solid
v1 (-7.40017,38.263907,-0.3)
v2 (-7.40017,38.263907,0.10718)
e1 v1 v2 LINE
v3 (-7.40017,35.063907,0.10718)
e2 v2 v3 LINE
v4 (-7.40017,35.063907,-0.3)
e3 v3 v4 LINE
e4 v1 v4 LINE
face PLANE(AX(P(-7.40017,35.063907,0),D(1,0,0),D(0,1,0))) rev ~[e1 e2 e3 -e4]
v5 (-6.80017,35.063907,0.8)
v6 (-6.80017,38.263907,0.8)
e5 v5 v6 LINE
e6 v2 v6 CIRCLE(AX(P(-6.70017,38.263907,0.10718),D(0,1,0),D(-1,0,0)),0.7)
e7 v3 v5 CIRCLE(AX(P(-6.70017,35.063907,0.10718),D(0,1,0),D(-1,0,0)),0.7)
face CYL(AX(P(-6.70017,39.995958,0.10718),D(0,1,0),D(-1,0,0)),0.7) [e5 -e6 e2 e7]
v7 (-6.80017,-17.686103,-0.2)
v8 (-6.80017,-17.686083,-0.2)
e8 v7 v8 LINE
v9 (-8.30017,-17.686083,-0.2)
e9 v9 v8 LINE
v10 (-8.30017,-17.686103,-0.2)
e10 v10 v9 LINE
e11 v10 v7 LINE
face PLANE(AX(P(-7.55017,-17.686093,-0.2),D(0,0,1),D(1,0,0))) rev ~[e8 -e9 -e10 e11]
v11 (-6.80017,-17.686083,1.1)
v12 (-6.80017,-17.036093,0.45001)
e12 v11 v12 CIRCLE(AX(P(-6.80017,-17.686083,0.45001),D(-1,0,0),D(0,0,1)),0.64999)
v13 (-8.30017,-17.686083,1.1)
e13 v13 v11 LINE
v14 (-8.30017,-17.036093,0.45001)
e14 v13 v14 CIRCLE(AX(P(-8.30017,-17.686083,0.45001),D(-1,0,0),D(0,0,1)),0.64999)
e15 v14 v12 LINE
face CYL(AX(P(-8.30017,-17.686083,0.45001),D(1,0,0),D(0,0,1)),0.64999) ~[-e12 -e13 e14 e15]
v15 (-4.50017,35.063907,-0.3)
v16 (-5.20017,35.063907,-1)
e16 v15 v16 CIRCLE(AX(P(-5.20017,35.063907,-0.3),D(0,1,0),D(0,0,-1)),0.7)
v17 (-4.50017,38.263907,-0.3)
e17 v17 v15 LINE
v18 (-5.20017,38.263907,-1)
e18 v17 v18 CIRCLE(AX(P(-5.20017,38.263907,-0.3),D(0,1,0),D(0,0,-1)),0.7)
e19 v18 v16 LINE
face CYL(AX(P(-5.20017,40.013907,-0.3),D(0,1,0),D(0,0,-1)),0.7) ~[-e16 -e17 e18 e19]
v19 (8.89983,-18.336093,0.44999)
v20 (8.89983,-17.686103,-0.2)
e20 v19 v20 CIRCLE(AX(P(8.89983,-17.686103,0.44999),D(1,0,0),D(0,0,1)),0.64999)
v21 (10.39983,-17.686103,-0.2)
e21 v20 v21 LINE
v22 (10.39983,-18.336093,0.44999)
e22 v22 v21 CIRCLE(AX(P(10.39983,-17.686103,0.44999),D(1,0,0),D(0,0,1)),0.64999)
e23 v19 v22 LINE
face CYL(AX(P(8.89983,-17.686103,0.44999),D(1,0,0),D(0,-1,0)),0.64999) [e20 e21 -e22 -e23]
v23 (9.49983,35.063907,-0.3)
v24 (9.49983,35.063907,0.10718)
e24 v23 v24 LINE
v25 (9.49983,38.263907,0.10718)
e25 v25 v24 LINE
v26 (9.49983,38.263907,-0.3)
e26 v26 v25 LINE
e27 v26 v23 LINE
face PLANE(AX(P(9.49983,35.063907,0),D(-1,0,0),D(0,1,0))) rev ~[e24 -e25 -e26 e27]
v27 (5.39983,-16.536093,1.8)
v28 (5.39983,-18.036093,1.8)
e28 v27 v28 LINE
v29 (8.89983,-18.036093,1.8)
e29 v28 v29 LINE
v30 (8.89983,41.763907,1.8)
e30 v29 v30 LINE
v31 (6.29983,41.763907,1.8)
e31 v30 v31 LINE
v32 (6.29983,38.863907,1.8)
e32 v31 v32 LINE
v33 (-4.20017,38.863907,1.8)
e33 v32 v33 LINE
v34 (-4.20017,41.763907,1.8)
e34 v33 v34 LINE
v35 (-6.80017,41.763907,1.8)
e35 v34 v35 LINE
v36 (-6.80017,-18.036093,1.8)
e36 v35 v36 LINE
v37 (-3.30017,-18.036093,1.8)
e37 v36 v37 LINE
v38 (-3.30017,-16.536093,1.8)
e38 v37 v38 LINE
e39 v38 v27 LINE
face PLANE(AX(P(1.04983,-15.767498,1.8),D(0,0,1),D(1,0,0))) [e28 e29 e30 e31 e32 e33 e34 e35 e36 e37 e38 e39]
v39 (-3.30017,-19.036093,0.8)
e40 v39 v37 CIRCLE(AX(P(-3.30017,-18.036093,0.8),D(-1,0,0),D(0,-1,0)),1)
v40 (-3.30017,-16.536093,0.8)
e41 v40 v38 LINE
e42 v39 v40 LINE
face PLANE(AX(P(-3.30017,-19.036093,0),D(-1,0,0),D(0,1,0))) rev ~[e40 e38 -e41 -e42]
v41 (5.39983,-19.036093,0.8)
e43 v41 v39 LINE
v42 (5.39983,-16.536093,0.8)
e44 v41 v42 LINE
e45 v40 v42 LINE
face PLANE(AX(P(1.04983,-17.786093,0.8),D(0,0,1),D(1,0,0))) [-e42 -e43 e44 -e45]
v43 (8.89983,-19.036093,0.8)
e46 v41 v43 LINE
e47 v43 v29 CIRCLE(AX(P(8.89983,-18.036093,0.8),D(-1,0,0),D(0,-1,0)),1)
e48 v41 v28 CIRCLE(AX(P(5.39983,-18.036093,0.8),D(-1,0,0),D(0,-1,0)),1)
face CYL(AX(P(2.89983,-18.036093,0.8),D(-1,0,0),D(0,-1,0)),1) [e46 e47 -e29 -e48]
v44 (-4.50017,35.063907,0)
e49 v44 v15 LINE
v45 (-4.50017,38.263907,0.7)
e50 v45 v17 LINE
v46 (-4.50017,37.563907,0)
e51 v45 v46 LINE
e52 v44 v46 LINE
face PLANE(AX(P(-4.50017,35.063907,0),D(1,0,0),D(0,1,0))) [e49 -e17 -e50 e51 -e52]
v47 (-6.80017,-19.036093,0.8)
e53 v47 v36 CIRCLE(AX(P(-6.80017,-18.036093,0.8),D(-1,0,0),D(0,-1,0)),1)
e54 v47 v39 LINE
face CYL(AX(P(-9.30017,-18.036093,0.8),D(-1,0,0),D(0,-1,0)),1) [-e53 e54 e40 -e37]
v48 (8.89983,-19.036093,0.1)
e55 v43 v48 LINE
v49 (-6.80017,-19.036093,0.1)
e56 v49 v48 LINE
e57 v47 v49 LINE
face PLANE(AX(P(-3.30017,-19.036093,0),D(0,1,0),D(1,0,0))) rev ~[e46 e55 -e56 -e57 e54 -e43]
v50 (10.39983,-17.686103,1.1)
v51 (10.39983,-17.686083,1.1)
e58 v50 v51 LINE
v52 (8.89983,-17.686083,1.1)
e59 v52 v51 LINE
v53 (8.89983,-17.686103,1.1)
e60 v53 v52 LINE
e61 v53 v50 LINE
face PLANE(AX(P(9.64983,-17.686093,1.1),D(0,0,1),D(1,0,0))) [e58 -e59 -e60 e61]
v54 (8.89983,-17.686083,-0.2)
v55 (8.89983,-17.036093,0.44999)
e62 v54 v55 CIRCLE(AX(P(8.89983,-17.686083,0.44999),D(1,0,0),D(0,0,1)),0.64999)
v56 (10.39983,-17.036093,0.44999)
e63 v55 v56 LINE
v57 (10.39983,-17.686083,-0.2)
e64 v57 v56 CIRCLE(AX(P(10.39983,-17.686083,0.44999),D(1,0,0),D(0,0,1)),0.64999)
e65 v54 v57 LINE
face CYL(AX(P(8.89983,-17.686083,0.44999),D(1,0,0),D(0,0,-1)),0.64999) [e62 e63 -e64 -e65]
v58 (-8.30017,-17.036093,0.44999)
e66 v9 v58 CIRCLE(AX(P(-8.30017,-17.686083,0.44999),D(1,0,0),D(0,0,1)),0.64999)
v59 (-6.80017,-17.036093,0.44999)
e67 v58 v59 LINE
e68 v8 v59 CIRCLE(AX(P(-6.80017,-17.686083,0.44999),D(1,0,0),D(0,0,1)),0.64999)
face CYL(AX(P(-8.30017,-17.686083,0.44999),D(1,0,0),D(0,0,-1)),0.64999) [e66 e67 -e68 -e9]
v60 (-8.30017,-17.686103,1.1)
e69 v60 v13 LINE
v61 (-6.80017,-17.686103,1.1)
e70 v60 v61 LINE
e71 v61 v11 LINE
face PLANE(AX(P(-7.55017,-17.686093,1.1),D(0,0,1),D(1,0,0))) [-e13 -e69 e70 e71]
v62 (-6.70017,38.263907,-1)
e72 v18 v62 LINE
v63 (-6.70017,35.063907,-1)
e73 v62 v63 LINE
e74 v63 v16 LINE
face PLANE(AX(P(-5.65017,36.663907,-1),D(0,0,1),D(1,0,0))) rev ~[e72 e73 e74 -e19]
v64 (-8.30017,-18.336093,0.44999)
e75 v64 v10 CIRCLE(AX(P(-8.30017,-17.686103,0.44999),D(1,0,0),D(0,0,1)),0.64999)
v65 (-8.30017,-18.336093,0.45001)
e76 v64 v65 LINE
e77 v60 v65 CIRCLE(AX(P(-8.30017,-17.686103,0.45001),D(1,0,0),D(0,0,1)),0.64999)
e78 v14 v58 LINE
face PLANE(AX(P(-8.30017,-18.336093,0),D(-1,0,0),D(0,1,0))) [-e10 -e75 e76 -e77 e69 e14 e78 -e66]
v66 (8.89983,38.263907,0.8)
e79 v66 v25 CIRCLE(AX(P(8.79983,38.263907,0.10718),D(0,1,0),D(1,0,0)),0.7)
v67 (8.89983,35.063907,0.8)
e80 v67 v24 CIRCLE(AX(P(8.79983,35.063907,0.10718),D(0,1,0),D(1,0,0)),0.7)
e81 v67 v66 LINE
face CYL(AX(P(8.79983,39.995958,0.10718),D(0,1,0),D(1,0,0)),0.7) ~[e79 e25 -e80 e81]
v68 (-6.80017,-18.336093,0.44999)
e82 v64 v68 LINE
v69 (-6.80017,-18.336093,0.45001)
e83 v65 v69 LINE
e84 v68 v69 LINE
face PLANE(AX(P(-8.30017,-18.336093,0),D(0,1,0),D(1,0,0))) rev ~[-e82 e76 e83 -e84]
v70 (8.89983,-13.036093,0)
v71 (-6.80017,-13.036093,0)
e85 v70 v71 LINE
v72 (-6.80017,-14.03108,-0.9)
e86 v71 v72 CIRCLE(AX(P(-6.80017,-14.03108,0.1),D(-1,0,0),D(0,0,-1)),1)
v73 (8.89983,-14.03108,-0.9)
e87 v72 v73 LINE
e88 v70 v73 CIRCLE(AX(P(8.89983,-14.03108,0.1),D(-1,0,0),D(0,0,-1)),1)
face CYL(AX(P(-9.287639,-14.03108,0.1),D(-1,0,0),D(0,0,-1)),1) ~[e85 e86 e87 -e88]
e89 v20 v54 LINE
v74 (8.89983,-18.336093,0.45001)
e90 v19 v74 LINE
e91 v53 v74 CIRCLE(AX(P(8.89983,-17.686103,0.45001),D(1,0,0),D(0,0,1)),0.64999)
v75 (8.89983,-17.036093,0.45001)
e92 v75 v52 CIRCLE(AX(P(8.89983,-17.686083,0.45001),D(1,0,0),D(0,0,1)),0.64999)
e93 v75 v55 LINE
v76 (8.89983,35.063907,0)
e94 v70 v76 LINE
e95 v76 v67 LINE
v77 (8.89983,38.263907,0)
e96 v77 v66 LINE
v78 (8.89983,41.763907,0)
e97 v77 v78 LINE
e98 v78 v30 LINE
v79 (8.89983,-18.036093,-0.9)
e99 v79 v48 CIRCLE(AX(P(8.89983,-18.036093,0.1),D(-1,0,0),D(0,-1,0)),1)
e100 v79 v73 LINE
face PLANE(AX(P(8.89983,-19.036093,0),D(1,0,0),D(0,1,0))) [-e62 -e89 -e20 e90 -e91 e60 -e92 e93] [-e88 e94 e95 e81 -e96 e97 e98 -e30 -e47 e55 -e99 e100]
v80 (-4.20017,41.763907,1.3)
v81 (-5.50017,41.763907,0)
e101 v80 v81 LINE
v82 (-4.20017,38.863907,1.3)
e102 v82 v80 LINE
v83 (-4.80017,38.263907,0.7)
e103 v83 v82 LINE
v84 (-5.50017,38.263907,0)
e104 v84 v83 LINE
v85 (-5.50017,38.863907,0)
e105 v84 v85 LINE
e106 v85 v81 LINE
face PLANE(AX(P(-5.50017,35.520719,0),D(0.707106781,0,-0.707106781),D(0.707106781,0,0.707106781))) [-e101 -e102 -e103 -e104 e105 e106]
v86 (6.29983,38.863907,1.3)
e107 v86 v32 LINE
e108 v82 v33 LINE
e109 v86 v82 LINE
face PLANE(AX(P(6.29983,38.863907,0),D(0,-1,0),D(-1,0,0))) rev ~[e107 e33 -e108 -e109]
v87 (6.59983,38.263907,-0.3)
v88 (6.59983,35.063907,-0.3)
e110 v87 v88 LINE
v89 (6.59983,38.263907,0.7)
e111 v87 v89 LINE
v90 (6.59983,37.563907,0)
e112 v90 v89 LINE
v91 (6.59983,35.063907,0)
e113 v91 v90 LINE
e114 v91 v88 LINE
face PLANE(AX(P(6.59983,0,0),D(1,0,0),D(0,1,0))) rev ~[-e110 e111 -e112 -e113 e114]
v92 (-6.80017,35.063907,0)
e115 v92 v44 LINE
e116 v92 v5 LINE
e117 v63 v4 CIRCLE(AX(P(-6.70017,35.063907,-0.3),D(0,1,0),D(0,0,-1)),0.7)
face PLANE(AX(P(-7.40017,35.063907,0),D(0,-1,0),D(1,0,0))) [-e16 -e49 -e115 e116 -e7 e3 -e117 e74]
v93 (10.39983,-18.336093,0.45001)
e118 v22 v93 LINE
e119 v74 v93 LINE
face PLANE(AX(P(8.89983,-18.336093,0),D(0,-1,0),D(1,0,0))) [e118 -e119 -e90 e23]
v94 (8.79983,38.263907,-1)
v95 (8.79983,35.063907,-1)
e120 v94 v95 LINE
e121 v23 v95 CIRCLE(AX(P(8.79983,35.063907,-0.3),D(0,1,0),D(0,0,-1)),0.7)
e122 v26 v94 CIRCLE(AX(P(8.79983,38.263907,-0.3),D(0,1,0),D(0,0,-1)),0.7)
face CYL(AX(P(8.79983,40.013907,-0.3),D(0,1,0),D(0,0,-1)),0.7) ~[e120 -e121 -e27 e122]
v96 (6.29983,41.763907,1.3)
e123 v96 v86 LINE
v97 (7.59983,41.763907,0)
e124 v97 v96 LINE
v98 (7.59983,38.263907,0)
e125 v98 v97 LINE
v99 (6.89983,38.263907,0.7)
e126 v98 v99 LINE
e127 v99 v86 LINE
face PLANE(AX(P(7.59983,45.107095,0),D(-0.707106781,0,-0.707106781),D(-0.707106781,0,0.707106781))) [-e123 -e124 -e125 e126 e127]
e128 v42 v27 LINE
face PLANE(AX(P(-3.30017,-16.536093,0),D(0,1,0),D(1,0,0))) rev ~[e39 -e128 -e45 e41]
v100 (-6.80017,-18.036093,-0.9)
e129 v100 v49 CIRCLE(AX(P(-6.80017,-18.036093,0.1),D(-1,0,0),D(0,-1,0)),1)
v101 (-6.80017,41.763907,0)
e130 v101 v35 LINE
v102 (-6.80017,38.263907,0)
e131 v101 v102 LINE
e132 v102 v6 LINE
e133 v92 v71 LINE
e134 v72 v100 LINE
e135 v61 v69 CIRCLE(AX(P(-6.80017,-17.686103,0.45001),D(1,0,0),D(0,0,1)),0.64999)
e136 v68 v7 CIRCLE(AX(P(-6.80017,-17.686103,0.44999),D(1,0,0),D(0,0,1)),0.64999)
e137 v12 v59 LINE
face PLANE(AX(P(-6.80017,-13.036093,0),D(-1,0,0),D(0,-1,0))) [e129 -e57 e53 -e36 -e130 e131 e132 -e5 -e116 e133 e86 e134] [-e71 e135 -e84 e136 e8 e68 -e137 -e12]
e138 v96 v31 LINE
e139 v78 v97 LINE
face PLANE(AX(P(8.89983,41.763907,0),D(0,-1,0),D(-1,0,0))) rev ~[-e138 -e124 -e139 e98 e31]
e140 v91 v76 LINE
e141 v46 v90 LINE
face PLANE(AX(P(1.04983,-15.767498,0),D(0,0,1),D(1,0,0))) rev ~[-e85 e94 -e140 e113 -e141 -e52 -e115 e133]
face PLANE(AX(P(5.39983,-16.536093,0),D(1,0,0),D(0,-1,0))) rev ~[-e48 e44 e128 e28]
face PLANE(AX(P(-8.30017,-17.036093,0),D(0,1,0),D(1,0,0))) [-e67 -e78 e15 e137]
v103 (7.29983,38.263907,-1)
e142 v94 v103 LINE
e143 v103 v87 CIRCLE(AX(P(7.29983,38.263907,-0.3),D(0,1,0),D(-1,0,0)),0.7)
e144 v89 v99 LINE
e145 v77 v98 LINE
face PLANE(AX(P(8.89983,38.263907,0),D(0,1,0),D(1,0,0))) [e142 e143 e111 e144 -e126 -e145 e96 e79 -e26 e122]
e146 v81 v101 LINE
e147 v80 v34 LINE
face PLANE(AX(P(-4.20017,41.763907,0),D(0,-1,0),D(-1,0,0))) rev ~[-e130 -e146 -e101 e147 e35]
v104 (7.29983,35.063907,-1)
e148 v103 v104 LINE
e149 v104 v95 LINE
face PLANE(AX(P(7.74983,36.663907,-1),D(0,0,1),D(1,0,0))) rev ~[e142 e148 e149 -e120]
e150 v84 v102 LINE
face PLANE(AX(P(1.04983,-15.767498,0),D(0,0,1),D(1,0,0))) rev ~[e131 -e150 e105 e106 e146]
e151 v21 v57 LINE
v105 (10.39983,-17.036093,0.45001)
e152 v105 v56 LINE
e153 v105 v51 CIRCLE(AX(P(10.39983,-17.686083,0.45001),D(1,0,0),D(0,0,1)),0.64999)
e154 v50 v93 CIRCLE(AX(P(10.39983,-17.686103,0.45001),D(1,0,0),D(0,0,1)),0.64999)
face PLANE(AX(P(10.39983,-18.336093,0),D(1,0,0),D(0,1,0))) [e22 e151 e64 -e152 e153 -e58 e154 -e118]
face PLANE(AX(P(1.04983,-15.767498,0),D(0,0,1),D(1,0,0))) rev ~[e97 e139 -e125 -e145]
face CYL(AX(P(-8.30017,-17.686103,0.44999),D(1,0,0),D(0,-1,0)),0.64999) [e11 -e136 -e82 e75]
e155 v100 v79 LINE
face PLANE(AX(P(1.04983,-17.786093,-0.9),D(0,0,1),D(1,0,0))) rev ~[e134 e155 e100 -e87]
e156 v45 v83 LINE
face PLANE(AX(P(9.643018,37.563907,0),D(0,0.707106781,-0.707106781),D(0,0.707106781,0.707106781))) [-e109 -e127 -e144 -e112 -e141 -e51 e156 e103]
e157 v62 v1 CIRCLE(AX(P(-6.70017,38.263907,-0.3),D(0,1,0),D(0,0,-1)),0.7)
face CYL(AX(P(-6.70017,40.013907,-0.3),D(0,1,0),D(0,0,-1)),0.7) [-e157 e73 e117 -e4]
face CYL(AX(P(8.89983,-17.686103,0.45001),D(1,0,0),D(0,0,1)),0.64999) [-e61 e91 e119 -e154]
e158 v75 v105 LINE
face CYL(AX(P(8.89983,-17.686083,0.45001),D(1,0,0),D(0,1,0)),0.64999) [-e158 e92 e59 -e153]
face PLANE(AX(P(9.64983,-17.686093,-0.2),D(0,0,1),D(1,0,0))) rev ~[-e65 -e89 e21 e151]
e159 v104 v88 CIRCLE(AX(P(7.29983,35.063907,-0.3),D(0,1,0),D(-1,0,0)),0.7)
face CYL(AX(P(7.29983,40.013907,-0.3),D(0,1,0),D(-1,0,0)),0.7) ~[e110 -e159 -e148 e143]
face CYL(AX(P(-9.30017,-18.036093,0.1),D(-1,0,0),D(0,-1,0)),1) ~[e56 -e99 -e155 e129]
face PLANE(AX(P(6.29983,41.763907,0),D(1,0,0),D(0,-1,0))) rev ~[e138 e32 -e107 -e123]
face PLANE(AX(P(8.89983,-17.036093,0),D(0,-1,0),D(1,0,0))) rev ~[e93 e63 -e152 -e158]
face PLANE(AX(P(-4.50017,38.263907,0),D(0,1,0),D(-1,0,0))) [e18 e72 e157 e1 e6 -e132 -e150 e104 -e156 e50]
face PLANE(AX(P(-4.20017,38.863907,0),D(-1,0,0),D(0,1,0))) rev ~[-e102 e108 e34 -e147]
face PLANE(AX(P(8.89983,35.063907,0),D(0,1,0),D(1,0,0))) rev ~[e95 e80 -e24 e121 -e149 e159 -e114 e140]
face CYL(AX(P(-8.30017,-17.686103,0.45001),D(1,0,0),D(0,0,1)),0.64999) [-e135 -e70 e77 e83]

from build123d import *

# Parameters (mm, degrees)
F0_W         = 2.3
F0_H         = 3.2
F1_DEPTH     = 1.8
F0_W_2       = 8.7
F0_H_2       = 2.5
F2_DEPTH     = 0.9
F0_W_3       = 0.6
F3_DEPTH     = 1
F4_DEPTH     = 0.8
F5_DEPTH     = 0.8
F6_T4_DEPTH  = 9.5863757687
F6_T10_DEPTH = 9.5863757687
F6_T16_DEPTH = 17.1863757687
F6_T23_DEPTH = 17.1863757687
F6_T31_DEPTH = 9.5863757687
F6_T37_DEPTH = 9.5863757687
F7_T1_DEPTH  = 6.6641016151
F7_T3_DEPTH  = 6.7
F8_T1_DEPTH  = 8.5
F8_T3_DEPTH  = 20.7
F8_T5_DEPTH  = 8.5
F8_T7_DEPTH  = 20.6749371855
F0_W_4       = 1.5
F0_H_3       = 1.3
F9_DEPTH     = 0.2
F10_DEPTH    = 1.1
F11_R        = 0.64999
F12_R        = 0.64999


# Not quite as in the source:
# - a fillet or chamfer that OpenCascade refuses, or shapes differently, is made with other operations: its cross-section is extruded or revolved along the edge and cut away or added
# - a fillet or chamfer is up to 0.001 mm smaller than in the source, because OpenCascade refuses the exact size


with BuildPart() as f1:
    # F0 (on Top) → F1 (new body)
    with BuildSketch(Plane.XY):
        Polygon((8.8998297817, -13.0360927206), (-6.8001702183, -13.0360927206), (-6.8001702183, -16.0360927206), (-6.8001702183, -17.0360927206), (-6.8001702183, -18.3360927206), (-6.8001702183, -19.0360927206), (-3.3001702183, -19.0360927206), (-3.3001702183, -16.5360927206), (5.3998297817, -16.5360927206), (5.3998297817, -19.0360927206), (8.8998297817, -19.0360927206), (8.8998297817, -18.3360927206), (8.8998297817, -17.0360927206), align=None)
        Polygon((-4.2001702183, 41.7639072794), (-6.8001702183, 41.7639072794), (-6.8001702183, 38.2639072794), (-4.5001702183, 38.2639072794), (-4.5001702183, 35.0639072794), (-6.8001702183, 35.0639072794), (-6.8001702183, -13.0360927206), (8.8998297817, -13.0360927206), (8.8998297817, 35.0639072794), (6.5998297817, 35.0639072794), (6.5998297817, 38.2639072794), (8.8998297817, 38.2639072794), (8.8998297817, 41.7639072794), (6.2998297817, 41.7639072794), (6.2998297817, 38.8639072794), (-4.2001702183, 38.8639072794), align=None)
        with Locations((7.7498297817, 36.6639072794)):
            Rectangle(F0_W, F0_H)
        with Locations((-5.6501702183, 36.6639072794)):
            Rectangle(F0_W, F0_H)
    extrude(amount=F1_DEPTH)

    # F0 (on Top) → F2 (join)
    with BuildSketch(Plane.XY):
        with Locations((1.0498297817, -17.7860927206)):
            Rectangle(F0_W_2, F0_H_2)
        Polygon((8.8998297817, -13.0360927206), (-6.8001702183, -13.0360927206), (-6.8001702183, -16.0360927206), (-6.8001702183, -17.0360927206), (-6.8001702183, -18.3360927206), (-6.8001702183, -19.0360927206), (-3.3001702183, -19.0360927206), (-3.3001702183, -16.5360927206), (5.3998297817, -16.5360927206), (5.3998297817, -19.0360927206), (8.8998297817, -19.0360927206), (8.8998297817, -18.3360927206), (8.8998297817, -17.0360927206), align=None)
    extrude(amount=-F2_DEPTH)

    # F0 (on Top) → F3 (join)
    with BuildSketch(Plane.XY):
        with Locations((7.7498297817, 36.6639072794)):
            Rectangle(F0_W, F0_H)
        with Locations((9.1998297817, 36.6639072794)):
            Rectangle(F0_W_3, F0_H)
        with Locations((-5.6501702183, 36.6639072794)):
            Rectangle(F0_W, F0_H)
        with Locations((-7.1001702183, 36.6639072794)):
            Rectangle(F0_W_3, F0_H)
    extrude(amount=-F3_DEPTH)

    # F0 (on Top) → F4 (join)
    with BuildSketch(Plane.XY):
        with Locations((9.1998297817, 36.6639072794)):
            Rectangle(F0_W_3, F0_H)
        with Locations((-7.1001702183, 36.6639072794)):
            Rectangle(F0_W_3, F0_H)
    extrude(amount=F4_DEPTH)

    # F0 (on Top) → F5 (join)
    with BuildSketch(Plane.XY):
        with Locations((1.0498297817, -17.7860927206)):
            Rectangle(F0_W_2, F0_H_2)
    extrude(amount=F5_DEPTH)

    # F6: chamfer of 1.3 on 3 edges, made by hand


with BuildPart() as f6_tool2:
    # F6_s3 → F6_t4 (new body)
    with BuildSketch(Plane.XZ.offset(-45.1070951637)):
        Polygon((7.5998297817, 0), (6.2998297817, 1.3), (6.2998297817, 0), align=None)
    extrude(amount=F6_T4_DEPTH)

    split(bisect_by=Plane.XZ.offset(-38.2639072794), keep=Keep.BOTTOM)

    split(bisect_by=Plane(origin=(0, 18.7819536397, -18.7819536397), x_dir=(1, 0, 0), z_dir=(0, 0.7071067812, -0.7071067812)), keep=Keep.TOP)


with BuildPart() as f1_1:
    add(f1.part)

    # F6_t1: cut F6_tool2
    add(f6_tool2.part, mode=Mode.SUBTRACT)


with BuildPart() as f6_tool8:
    # F6_s9 → F6_t10 (new body)
    with BuildSketch(Plane.XZ.offset(-45.1070951637)):
        Polygon((7.5998297817, 0), (6.2998297817, 1.3), (6.2998297817, 0), align=None)
    extrude(amount=F6_T10_DEPTH)

    split(bisect_by=Plane.YZ.offset(6.5998297817), keep=Keep.BOTTOM)

    split(bisect_by=Plane(origin=(0, 18.7819536397, -18.7819536397), x_dir=(1, 0, 0), z_dir=(0, 0.7071067812, -0.7071067812)), keep=Keep.TOP)


with BuildPart() as f1_2:
    add(f1_1.part)

    # F6_t7: cut F6_tool8
    add(f6_tool8.part, mode=Mode.SUBTRACT)


with BuildPart() as f6_tool14:
    # F6_s15 → F6_t16 (new body)
    with BuildSketch(Plane.YZ.offset(9.6430176661)):
        Polygon((37.5639072794, 0), (38.8639072794, 1.3), (38.8639072794, 0), align=None)
    extrude(amount=-F6_T16_DEPTH)

    split(bisect_by=Plane.XZ.offset(-38.2639072794), keep=Keep.BOTTOM)

    split(bisect_by=Plane(origin=(-2.7500851092, 0, 2.7500851092), x_dir=(0, 1, 0), z_dir=(0.7071067812, 0, -0.7071067812)), keep=Keep.TOP)

    split(bisect_by=Plane(origin=(3.7999148908, 0, 3.7999148908), x_dir=(0, 1, 0), z_dir=(-0.7071067812, 0, -0.7071067812)), keep=Keep.TOP)


with BuildPart() as f1_3:
    add(f1_2.part)

    # F6_t13: cut F6_tool14
    add(f6_tool14.part, mode=Mode.SUBTRACT)


with BuildPart() as f6_tool21:
    # F6_s22 → F6_t23 (new body)
    with BuildSketch(Plane.YZ.offset(9.6430176661)):
        Polygon((37.5639072794, 0), (38.8639072794, 1.3), (38.8639072794, 0), align=None)
    extrude(amount=-F6_T23_DEPTH)

    split(bisect_by=Plane.YZ.offset(6.5998297817), keep=Keep.BOTTOM)

    split(bisect_by=Plane.YZ.offset(-4.5001702183), keep=Keep.TOP)

    split(bisect_by=Plane(origin=(-2.7500851092, 0, 2.7500851092), x_dir=(0, 1, 0), z_dir=(0.7071067812, 0, -0.7071067812)), keep=Keep.TOP)

    split(bisect_by=Plane(origin=(3.7999148908, 0, 3.7999148908), x_dir=(0, 1, 0), z_dir=(-0.7071067812, 0, -0.7071067812)), keep=Keep.TOP)


with BuildPart() as f1_4:
    add(f1_3.part)

    # F6_t20: cut F6_tool21
    add(f6_tool21.part, mode=Mode.SUBTRACT)


with BuildPart() as f6_tool29:
    # F6_s30 → F6_t31 (new body)
    with BuildSketch(Plane.XZ.offset(-35.520719395)):
        Polygon((-5.5001702183, 0), (-4.2001702183, 1.3), (-4.2001702183, 0), align=None)
    extrude(amount=-F6_T31_DEPTH)

    split(bisect_by=Plane.YZ.offset(-4.5001702183), keep=Keep.TOP)

    split(bisect_by=Plane(origin=(0, 18.7819536397, -18.7819536397), x_dir=(1, 0, 0), z_dir=(0, 0.7071067812, -0.7071067812)), keep=Keep.TOP)


with BuildPart() as f1_5:
    add(f1_4.part)

    # F6_t28: cut F6_tool29
    add(f6_tool29.part, mode=Mode.SUBTRACT)


with BuildPart() as f6_tool35:
    # F6_s36 → F6_t37 (new body)
    with BuildSketch(Plane.XZ.offset(-35.520719395)):
        Polygon((-5.5001702183, 0), (-4.2001702183, 1.3), (-4.2001702183, 0), align=None)
    extrude(amount=-F6_T37_DEPTH)

    split(bisect_by=Plane.XZ.offset(-38.2639072794), keep=Keep.BOTTOM)

    split(bisect_by=Plane(origin=(0, 18.7819536397, -18.7819536397), x_dir=(1, 0, 0), z_dir=(0, 0.7071067812, -0.7071067812)), keep=Keep.TOP)


with BuildPart() as f1_6:
    add(f1_5.part)

    # F6_t34: cut F6_tool35
    add(f6_tool35.part, mode=Mode.SUBTRACT)

    # F7: fillet of radius 0.7 on 6 edges, made by hand

    # F7_s2 → F7_t1 (cut)
    with BuildSketch(Plane.XZ.offset(-39.9959580869)):
        with BuildLine():
            ThreePointArc((-7.4001702183, 0.107179677), (-7.2293204805, 0.5654372465), (-6.8001702183, 0.8))
            Line((-6.8001702183, 0.8), (-7.4001702183, 0.8))
            Line((-7.4001702183, 0.8), (-7.4001702183, 0.107179677))
        make_face()
        with BuildLine():
            ThreePointArc((9.4998297817, 0.107179677), (9.3289800439, 0.5654372465), (8.8998297817, 0.8))
            Line((8.8998297817, 0.8), (9.4998297817, 0.8))
            Line((9.4998297817, 0.8), (9.4998297817, 0.107179677))
        make_face()
    extrude(amount=F7_T1_DEPTH, mode=Mode.SUBTRACT)

    # F7_s4 → F7_t3 (cut)
    with BuildSketch(Plane.XZ.offset(-40.0139072794)):
        with BuildLine():
            ThreePointArc((-6.7001702183, -1), (-7.1951449651, -0.7949747468), (-7.4001702183, -0.3))
            Line((-7.4001702183, -0.3), (-7.4001702183, -1))
            Line((-7.4001702183, -1), (-6.7001702183, -1))
        make_face()
        with BuildLine():
            ThreePointArc((-5.2001702183, -1), (-4.7051954715, -0.7949747468), (-4.5001702183, -0.3))
            Line((-4.5001702183, -0.3), (-4.5001702183, -1))
            Line((-4.5001702183, -1), (-5.2001702183, -1))
        make_face()
        with BuildLine():
            ThreePointArc((6.5998297817, -0.3), (6.8048550349, -0.7949747468), (7.2998297817, -1))
            Line((7.2998297817, -1), (6.5998297817, -1))
            Line((6.5998297817, -1), (6.5998297817, -0.3))
        make_face()
        with BuildLine():
            ThreePointArc((8.7998297817, -1), (9.2948045285, -0.7949747468), (9.4998297817, -0.3))
            Line((9.4998297817, -0.3), (9.4998297817, -1))
            Line((9.4998297817, -1), (8.7998297817, -1))
        make_face()
    extrude(amount=F7_T3_DEPTH, mode=Mode.SUBTRACT)

    # F8: fillet of radius 1 on 4 edges, made by hand

    # F8_s2 → F8_t1 (cut)
    with BuildSketch(Plane.YZ.offset(-9.3001702183)):
        with BuildLine():
            ThreePointArc((-19.0360927206, 0.8), (-18.7431995018, 1.5071067812), (-18.0360927206, 1.8))
            Line((-18.0360927206, 1.8), (-19.0360927206, 1.8))
            Line((-19.0360927206, 1.8), (-19.0360927206, 0.8))
        make_face()
    extrude(amount=F8_T1_DEPTH, mode=Mode.SUBTRACT)

    # F8_s4 → F8_t3 (cut)
    with BuildSketch(Plane.YZ.offset(-9.3001702183)):
        with BuildLine():
            ThreePointArc((-19.0360927206, 0.1), (-18.7431995018, -0.6071067812), (-18.0360927206, -0.9))
            Line((-18.0360927206, -0.9), (-19.0360927206, -0.9))
            Line((-19.0360927206, -0.9), (-19.0360927206, 0.1))
        make_face()
    extrude(amount=F8_T3_DEPTH, mode=Mode.SUBTRACT)

    # F8_s6 → F8_t5 (cut)
    with BuildSketch(Plane.YZ.offset(2.8998297817)):
        with BuildLine():
            ThreePointArc((-19.0360927206, 0.8), (-18.7431995018, 1.5071067812), (-18.0360927206, 1.8))
            Line((-18.0360927206, 1.8), (-19.0360927206, 1.8))
            Line((-19.0360927206, 1.8), (-19.0360927206, 0.8))
        make_face()
    extrude(amount=F8_T5_DEPTH, mode=Mode.SUBTRACT)

    # F8_s8 → F8_t7 (cut)
    with BuildSketch(Plane.YZ.offset(-9.2876388111)):
        with BuildLine():
            ThreePointArc((-14.0310801578, -0.9), (-13.3602597645, -0.6416198487), (-13.0360927206, 0))
            Line((-13.0360927206, 0), (-13.0360927206, -0.9))
            Line((-13.0360927206, -0.9), (-14.0310801578, -0.9))
        make_face()
    extrude(amount=F8_T7_DEPTH, mode=Mode.SUBTRACT)

    # F0 (on Top) → F9 (join)
    with BuildSketch(Plane.XY):
        with Locations((-7.5501702183, -17.6860927206)):
            Rectangle(F0_W_4, F0_H_3)
        with Locations((9.6498297817, -17.6860927206)):
            Rectangle(F0_W_4, F0_H_3)
    extrude(amount=-F9_DEPTH)

    # F0 (on Top) → F10 (join)
    with BuildSketch(Plane.XY):
        with Locations((-7.5501702183, -17.6860927206)):
            Rectangle(F0_W_4, F0_H_3)
        with Locations((9.6498297817, -17.6860927206)):
            Rectangle(F0_W_4, F0_H_3)
    extrude(amount=F10_DEPTH)

    # F11 (radius 0.65 in the source; OpenCascade refuses exactly that, so slightly less here)
    f11_edges = [f1_6.edges().sort_by_distance(p)[0] for p in [
        (9.64983, -17.036093, 1.1),
        (9.64983, -18.336093, 1.1),
    ]]
    fillet(f11_edges, radius=F11_R)

    # F12 (radius 0.65 in the source; OpenCascade refuses exactly that, so slightly less here)
    f12_edges = [f1_6.edges().sort_by_distance(p)[0] for p in [
        (9.64983, -18.336093, -0.2),
        (9.64983, -17.036093, -0.2),
        (-7.55017, -18.336093, -0.2),
        (-7.55017, -17.036093, -0.2),
        (-7.55017, -18.336093, 1.1),
        (-7.55017, -17.036093, 1.1),
    ]]
    fillet(f12_edges, radius=F12_R)


solid = f1_6.part
